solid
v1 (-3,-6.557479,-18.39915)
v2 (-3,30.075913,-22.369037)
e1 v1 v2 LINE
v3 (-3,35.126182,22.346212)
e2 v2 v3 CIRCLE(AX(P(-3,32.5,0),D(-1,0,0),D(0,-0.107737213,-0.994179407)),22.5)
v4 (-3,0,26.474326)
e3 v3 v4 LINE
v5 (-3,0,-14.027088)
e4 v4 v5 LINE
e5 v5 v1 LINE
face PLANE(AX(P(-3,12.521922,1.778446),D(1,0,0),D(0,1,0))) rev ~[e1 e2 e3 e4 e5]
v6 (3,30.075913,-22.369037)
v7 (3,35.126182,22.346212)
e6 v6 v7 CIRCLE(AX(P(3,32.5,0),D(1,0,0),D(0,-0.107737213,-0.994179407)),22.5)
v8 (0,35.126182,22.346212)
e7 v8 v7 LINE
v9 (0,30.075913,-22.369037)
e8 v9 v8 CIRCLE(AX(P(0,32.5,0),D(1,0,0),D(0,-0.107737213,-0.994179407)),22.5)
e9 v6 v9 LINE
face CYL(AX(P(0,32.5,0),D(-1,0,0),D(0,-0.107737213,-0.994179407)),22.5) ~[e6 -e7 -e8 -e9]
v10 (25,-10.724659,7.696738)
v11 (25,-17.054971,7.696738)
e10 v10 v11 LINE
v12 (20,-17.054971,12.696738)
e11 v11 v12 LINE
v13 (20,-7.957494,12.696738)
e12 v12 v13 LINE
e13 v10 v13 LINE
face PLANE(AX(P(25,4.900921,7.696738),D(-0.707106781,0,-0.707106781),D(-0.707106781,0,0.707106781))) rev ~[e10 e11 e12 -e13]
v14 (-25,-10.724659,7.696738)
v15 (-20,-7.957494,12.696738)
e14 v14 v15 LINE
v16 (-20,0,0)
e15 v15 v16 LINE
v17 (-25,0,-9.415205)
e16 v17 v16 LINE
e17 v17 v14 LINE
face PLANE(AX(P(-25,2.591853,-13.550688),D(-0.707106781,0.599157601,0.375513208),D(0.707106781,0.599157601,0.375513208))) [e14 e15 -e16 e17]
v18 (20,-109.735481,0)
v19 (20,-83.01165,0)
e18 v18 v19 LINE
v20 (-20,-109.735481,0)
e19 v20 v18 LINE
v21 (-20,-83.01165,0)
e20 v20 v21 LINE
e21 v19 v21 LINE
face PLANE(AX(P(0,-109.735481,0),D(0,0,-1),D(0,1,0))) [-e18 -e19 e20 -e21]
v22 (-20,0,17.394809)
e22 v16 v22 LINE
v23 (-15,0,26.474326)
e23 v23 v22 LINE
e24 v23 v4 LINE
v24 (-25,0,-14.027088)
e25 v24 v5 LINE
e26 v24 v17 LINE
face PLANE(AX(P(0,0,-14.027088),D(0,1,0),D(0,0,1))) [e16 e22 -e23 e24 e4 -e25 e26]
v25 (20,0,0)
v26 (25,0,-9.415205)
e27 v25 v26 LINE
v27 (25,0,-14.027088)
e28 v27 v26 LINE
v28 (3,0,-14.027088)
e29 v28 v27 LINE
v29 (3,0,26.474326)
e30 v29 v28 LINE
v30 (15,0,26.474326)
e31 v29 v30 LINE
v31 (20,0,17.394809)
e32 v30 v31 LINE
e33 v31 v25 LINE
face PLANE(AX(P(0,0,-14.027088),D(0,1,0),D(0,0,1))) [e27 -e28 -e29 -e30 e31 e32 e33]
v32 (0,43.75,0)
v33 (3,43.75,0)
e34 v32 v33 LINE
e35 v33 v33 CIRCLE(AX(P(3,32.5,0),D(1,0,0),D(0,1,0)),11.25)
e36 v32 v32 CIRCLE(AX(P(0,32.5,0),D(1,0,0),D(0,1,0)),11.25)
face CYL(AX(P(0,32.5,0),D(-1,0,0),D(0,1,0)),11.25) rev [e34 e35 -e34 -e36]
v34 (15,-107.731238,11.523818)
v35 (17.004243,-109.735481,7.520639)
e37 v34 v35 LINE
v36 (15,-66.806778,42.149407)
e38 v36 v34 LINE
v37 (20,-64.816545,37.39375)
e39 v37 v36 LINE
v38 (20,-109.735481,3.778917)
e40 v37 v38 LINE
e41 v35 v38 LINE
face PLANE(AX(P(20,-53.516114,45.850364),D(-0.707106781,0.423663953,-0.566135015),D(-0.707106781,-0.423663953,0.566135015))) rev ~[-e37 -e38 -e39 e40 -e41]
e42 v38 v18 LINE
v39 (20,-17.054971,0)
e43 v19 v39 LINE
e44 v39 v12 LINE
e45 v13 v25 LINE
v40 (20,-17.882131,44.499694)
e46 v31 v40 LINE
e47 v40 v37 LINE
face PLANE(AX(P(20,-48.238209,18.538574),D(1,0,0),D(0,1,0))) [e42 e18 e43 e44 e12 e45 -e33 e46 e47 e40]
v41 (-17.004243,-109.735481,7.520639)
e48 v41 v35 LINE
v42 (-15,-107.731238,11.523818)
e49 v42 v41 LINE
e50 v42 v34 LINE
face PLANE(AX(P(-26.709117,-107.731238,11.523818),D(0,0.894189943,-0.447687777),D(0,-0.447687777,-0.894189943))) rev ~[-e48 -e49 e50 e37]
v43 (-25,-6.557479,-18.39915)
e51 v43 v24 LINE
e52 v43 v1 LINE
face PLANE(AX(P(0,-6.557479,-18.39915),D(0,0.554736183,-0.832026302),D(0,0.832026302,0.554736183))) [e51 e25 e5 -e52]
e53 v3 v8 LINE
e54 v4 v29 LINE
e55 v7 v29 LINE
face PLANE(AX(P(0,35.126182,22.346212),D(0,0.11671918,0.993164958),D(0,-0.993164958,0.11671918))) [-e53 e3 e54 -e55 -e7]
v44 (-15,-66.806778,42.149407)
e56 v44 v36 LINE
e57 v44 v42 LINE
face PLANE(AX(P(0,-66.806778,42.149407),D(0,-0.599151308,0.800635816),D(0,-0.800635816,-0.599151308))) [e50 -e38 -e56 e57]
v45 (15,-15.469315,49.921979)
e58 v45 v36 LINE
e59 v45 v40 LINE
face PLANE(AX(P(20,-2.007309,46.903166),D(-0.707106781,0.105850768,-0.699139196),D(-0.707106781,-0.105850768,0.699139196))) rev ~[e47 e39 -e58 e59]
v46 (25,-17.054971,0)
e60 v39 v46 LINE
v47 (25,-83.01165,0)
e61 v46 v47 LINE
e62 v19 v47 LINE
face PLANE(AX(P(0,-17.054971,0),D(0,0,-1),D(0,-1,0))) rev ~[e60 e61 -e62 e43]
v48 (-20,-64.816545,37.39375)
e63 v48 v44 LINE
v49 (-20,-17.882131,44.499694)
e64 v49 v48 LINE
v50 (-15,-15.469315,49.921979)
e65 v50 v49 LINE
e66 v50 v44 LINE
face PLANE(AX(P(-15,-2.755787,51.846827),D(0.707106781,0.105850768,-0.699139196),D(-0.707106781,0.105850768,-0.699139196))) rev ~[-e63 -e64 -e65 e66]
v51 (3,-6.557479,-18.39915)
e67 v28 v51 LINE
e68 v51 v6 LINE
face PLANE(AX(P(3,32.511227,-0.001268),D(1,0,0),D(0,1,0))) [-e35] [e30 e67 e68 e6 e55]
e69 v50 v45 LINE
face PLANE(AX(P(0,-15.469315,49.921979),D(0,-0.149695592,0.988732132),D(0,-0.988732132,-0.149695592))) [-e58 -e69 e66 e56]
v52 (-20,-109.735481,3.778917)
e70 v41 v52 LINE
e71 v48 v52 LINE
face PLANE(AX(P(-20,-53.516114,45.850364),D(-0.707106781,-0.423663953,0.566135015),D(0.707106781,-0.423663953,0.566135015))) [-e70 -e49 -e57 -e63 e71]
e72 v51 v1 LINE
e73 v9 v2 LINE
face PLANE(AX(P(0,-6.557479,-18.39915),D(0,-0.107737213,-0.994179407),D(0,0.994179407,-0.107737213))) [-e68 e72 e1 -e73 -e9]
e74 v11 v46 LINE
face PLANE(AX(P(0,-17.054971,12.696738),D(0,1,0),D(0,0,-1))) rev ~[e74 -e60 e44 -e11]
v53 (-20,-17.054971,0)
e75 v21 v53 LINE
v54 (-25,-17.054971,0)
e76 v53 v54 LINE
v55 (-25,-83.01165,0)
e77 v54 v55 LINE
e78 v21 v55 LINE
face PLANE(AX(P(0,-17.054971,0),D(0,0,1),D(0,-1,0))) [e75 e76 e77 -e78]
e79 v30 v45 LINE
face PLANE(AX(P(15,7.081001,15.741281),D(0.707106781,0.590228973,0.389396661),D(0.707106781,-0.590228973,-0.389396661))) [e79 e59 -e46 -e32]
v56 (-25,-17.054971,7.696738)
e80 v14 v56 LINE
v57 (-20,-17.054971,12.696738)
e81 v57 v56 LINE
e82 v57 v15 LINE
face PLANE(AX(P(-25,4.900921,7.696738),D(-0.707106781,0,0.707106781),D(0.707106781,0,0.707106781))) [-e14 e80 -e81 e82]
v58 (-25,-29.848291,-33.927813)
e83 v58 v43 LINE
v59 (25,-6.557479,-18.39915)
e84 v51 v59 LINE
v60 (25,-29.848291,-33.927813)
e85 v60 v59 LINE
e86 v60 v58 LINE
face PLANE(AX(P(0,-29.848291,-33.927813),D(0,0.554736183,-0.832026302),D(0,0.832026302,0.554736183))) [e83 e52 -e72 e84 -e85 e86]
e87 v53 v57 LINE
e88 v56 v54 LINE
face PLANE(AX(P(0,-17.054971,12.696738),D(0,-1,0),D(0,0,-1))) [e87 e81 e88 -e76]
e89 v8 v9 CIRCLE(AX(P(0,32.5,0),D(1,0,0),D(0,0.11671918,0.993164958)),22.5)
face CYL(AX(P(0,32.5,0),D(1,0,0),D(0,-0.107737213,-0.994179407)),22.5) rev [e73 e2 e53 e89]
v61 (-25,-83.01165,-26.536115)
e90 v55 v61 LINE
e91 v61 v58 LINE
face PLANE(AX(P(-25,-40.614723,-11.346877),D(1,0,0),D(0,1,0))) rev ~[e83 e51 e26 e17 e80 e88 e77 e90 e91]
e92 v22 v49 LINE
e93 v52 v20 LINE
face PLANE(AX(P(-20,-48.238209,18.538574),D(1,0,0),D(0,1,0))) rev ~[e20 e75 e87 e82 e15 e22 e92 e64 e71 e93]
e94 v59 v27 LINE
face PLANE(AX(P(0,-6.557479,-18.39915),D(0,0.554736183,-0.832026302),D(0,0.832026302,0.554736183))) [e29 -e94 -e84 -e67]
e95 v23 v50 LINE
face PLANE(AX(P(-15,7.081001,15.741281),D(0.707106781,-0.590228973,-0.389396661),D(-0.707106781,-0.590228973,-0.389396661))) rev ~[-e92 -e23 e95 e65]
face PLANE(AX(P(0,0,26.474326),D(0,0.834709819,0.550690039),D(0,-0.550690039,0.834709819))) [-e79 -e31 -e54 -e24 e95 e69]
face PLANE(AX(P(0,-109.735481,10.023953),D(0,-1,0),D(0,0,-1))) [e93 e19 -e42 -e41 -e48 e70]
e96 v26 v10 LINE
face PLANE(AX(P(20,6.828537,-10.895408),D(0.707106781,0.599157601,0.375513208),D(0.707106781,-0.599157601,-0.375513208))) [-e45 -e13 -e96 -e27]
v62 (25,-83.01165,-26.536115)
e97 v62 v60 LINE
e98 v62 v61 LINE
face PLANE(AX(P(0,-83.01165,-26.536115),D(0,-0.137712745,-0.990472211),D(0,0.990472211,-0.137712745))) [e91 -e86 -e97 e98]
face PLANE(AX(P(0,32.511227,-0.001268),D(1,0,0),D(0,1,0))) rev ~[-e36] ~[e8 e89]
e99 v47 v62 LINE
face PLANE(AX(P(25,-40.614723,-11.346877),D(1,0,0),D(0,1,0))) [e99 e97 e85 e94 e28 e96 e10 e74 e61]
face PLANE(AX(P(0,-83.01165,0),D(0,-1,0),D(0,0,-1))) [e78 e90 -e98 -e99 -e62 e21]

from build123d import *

# Parameters (mm, degrees)
F1_DEPTH      = 20
F1_DEPTH_BACK = 20
F2_DEPTH      = 25
F2_DEPTH_BACK = 25
F3_DEPTH      = 3
F3_DEPTH_BACK = 3
F0_R          = 11.25
F4_DEPTH      = 3
F5_T1_DEPTH   = 79.3350946098
F5_T3_DEPTH   = 53.4182341985
F5_T5_DEPTH   = 77.6393497362
F5_T7_DEPTH   = 53.8076131524
F5_T9_DEPTH   = 40.7011174437
F5_T11_DEPTH  = 34.8143073008


# Not quite as in the source:
# - a fillet or chamfer that OpenCascade refuses, or shapes differently, is made with other operations: its cross-section is extruded or revolved along the edge and cut away or added


with BuildPart() as f1:
    # F0 (on Right) → F1 (new body, two sides)
    with BuildSketch(Plane.YZ) as f1_sk:
        Polygon((0, 0), (0, 26.4743264821), (-15.4693145305, 49.9219790902), (-66.8067783117, 42.1494067516), (-109.735481441, 10.023953287), (-109.735481441, 0), (-83.011649549, 0), (-17.0549713075, 0), (-17.0549713075, 12.6967383549), (-7.9574938864, 12.6967383549), align=None)
    extrude(amount=F1_DEPTH)
    extrude(f1_sk.sketch, amount=-F1_DEPTH_BACK)

    # F0 (on Right) → F2 (join, two sides)
    with BuildSketch(Plane.YZ) as f2_sk:
        Polygon((-29.8482906073, -33.9278131723), (-6.5574786317, -18.399150059), (0, -14.0270879492), (0, 0), (-7.9574938864, 12.6967383549), (-17.0549713075, 12.6967383549), (-17.0549713075, 0), (-83.011649549, 0), (-83.011649549, -26.5361145139), align=None)
    extrude(amount=F2_DEPTH)
    extrude(f2_sk.sketch, amount=-F2_DEPTH_BACK)

    # F0 (on Right) → F3 (join, two sides)
    with BuildSketch(Plane.YZ) as f3_sk:
        with BuildLine():
            ThreePointArc((30.0759126991, -22.3690366524), (10.142147556, 2.5251602116), (35.1261815426, 22.346211547))
            Line((35.1261815426, 22.346211547), (0, 26.4743264821))
            Line((0, 26.4743264821), (0, 0))
            Line((0, 0), (0, -14.0270879492))
            Line((0, -14.0270879492), (-6.5574786317, -18.399150059))
            Line((-6.5574786317, -18.399150059), (30.0759126991, -22.3690366524))
        make_face()
    extrude(amount=F3_DEPTH)
    extrude(f3_sk.sketch, amount=-F3_DEPTH_BACK)

    # F0 (on Right) → F4 (join)
    with BuildSketch(Plane.YZ):
        with BuildLine():
            ThreePointArc((30.0759126991, -22.3690366524), (47.5284403005, -16.7450285797), (55, 0))
            ThreePointArc((55, 0), (49.3127791383, 14.9526070518), (35.1261815426, 22.346211547))
            ThreePointArc((35.1261815426, 22.346211547), (10.142147556, 2.5251602116), (30.0759126991, -22.3690366524))
        make_face()
        with Locations((32.5, 0)):
            Circle(F0_R, mode=Mode.SUBTRACT)
    extrude(amount=F4_DEPTH)

    # F5: chamfer of 5 on 11 edges, made by hand

    # F5_s2 → F5_t1 (cut)
    with BuildSketch(Plane(origin=(0, -12.3102659146, -9.2123182381), x_dir=(1, 0, 0), z_dir=(0, -0.8006358159, -0.5991513084))):
        Polygon((20, 68.7736932965), (15, 73.7736932965), (20, 73.7736932965), align=None)
        Polygon((-20, 68.7736932965), (-15, 73.7736932965), (-20, 73.7736932965), align=None)
    extrude(amount=F5_T1_DEPTH, mode=Mode.SUBTRACT)

    # F5_s4 → F5_t3 (cut)
    with BuildSketch(Plane.YZ.offset(-26.7091170992)):
        Polygon((-107.7312379828, 11.5238176028), (-109.735481441, 7.5206385233), (-109.735481441, 10.023953287), align=None)
    extrude(amount=F5_T3_DEPTH, mode=Mode.SUBTRACT)

    # F5_s6 → F5_t5 (cut)
    with BuildSketch(Plane(origin=(0, 4.9797561094, 0.7539428662), x_dir=(1, 0, 0), z_dir=(0, -0.9887321325, -0.1496955918))):
        Polygon((20, 46.675153037), (15, 51.675153037), (20, 51.675153037), align=None)
        Polygon((-15, 51.675153037), (-20, 46.675153037), (-20, 51.675153037), align=None)
    extrude(amount=F5_T5_DEPTH, mode=Mode.SUBTRACT)

    # F5_s8 → F5_t7 (cut)
    with BuildSketch(Plane(origin=(0, -5.0883568573, 7.7126897705), x_dir=(1, 0, 0), z_dir=(0, -0.5506900388, 0.8347098185))):
        Polygon((15, 14.5791478777), (20, 9.5791478777), (20, 14.5791478777), align=None)
        Polygon((-15, 14.5791478777), (-20, 9.5791478777), (-20, 14.5791478777), align=None)
    extrude(amount=F5_T7_DEPTH, mode=Mode.SUBTRACT)

    # F5_s10 → F5_t9 (cut)
    with BuildSketch(Plane(origin=(0, 6.8285367479, -10.8954082369), x_dir=(1, 0, 0), z_dir=(0, -0.5310558712, 0.8473368053))):
        Polygon((20, 0), (25, -5), (25, 0), align=None)
        Polygon((-25, -5), (-20, 0), (-25, 0), align=None)
    extrude(amount=F5_T9_DEPTH, mode=Mode.SUBTRACT)

    # F5_s12 → F5_t11 (cut)
    with BuildSketch(Plane.XZ.offset(-4.9009210535)):
        Polygon((25, 7.6967383549), (20, 12.6967383549), (25, 12.6967383549), align=None)
        Polygon((-25, 7.6967383549), (-20, 12.6967383549), (-25, 12.6967383549), align=None)
    extrude(amount=F5_T11_DEPTH, mode=Mode.SUBTRACT)


solid = f1.part
